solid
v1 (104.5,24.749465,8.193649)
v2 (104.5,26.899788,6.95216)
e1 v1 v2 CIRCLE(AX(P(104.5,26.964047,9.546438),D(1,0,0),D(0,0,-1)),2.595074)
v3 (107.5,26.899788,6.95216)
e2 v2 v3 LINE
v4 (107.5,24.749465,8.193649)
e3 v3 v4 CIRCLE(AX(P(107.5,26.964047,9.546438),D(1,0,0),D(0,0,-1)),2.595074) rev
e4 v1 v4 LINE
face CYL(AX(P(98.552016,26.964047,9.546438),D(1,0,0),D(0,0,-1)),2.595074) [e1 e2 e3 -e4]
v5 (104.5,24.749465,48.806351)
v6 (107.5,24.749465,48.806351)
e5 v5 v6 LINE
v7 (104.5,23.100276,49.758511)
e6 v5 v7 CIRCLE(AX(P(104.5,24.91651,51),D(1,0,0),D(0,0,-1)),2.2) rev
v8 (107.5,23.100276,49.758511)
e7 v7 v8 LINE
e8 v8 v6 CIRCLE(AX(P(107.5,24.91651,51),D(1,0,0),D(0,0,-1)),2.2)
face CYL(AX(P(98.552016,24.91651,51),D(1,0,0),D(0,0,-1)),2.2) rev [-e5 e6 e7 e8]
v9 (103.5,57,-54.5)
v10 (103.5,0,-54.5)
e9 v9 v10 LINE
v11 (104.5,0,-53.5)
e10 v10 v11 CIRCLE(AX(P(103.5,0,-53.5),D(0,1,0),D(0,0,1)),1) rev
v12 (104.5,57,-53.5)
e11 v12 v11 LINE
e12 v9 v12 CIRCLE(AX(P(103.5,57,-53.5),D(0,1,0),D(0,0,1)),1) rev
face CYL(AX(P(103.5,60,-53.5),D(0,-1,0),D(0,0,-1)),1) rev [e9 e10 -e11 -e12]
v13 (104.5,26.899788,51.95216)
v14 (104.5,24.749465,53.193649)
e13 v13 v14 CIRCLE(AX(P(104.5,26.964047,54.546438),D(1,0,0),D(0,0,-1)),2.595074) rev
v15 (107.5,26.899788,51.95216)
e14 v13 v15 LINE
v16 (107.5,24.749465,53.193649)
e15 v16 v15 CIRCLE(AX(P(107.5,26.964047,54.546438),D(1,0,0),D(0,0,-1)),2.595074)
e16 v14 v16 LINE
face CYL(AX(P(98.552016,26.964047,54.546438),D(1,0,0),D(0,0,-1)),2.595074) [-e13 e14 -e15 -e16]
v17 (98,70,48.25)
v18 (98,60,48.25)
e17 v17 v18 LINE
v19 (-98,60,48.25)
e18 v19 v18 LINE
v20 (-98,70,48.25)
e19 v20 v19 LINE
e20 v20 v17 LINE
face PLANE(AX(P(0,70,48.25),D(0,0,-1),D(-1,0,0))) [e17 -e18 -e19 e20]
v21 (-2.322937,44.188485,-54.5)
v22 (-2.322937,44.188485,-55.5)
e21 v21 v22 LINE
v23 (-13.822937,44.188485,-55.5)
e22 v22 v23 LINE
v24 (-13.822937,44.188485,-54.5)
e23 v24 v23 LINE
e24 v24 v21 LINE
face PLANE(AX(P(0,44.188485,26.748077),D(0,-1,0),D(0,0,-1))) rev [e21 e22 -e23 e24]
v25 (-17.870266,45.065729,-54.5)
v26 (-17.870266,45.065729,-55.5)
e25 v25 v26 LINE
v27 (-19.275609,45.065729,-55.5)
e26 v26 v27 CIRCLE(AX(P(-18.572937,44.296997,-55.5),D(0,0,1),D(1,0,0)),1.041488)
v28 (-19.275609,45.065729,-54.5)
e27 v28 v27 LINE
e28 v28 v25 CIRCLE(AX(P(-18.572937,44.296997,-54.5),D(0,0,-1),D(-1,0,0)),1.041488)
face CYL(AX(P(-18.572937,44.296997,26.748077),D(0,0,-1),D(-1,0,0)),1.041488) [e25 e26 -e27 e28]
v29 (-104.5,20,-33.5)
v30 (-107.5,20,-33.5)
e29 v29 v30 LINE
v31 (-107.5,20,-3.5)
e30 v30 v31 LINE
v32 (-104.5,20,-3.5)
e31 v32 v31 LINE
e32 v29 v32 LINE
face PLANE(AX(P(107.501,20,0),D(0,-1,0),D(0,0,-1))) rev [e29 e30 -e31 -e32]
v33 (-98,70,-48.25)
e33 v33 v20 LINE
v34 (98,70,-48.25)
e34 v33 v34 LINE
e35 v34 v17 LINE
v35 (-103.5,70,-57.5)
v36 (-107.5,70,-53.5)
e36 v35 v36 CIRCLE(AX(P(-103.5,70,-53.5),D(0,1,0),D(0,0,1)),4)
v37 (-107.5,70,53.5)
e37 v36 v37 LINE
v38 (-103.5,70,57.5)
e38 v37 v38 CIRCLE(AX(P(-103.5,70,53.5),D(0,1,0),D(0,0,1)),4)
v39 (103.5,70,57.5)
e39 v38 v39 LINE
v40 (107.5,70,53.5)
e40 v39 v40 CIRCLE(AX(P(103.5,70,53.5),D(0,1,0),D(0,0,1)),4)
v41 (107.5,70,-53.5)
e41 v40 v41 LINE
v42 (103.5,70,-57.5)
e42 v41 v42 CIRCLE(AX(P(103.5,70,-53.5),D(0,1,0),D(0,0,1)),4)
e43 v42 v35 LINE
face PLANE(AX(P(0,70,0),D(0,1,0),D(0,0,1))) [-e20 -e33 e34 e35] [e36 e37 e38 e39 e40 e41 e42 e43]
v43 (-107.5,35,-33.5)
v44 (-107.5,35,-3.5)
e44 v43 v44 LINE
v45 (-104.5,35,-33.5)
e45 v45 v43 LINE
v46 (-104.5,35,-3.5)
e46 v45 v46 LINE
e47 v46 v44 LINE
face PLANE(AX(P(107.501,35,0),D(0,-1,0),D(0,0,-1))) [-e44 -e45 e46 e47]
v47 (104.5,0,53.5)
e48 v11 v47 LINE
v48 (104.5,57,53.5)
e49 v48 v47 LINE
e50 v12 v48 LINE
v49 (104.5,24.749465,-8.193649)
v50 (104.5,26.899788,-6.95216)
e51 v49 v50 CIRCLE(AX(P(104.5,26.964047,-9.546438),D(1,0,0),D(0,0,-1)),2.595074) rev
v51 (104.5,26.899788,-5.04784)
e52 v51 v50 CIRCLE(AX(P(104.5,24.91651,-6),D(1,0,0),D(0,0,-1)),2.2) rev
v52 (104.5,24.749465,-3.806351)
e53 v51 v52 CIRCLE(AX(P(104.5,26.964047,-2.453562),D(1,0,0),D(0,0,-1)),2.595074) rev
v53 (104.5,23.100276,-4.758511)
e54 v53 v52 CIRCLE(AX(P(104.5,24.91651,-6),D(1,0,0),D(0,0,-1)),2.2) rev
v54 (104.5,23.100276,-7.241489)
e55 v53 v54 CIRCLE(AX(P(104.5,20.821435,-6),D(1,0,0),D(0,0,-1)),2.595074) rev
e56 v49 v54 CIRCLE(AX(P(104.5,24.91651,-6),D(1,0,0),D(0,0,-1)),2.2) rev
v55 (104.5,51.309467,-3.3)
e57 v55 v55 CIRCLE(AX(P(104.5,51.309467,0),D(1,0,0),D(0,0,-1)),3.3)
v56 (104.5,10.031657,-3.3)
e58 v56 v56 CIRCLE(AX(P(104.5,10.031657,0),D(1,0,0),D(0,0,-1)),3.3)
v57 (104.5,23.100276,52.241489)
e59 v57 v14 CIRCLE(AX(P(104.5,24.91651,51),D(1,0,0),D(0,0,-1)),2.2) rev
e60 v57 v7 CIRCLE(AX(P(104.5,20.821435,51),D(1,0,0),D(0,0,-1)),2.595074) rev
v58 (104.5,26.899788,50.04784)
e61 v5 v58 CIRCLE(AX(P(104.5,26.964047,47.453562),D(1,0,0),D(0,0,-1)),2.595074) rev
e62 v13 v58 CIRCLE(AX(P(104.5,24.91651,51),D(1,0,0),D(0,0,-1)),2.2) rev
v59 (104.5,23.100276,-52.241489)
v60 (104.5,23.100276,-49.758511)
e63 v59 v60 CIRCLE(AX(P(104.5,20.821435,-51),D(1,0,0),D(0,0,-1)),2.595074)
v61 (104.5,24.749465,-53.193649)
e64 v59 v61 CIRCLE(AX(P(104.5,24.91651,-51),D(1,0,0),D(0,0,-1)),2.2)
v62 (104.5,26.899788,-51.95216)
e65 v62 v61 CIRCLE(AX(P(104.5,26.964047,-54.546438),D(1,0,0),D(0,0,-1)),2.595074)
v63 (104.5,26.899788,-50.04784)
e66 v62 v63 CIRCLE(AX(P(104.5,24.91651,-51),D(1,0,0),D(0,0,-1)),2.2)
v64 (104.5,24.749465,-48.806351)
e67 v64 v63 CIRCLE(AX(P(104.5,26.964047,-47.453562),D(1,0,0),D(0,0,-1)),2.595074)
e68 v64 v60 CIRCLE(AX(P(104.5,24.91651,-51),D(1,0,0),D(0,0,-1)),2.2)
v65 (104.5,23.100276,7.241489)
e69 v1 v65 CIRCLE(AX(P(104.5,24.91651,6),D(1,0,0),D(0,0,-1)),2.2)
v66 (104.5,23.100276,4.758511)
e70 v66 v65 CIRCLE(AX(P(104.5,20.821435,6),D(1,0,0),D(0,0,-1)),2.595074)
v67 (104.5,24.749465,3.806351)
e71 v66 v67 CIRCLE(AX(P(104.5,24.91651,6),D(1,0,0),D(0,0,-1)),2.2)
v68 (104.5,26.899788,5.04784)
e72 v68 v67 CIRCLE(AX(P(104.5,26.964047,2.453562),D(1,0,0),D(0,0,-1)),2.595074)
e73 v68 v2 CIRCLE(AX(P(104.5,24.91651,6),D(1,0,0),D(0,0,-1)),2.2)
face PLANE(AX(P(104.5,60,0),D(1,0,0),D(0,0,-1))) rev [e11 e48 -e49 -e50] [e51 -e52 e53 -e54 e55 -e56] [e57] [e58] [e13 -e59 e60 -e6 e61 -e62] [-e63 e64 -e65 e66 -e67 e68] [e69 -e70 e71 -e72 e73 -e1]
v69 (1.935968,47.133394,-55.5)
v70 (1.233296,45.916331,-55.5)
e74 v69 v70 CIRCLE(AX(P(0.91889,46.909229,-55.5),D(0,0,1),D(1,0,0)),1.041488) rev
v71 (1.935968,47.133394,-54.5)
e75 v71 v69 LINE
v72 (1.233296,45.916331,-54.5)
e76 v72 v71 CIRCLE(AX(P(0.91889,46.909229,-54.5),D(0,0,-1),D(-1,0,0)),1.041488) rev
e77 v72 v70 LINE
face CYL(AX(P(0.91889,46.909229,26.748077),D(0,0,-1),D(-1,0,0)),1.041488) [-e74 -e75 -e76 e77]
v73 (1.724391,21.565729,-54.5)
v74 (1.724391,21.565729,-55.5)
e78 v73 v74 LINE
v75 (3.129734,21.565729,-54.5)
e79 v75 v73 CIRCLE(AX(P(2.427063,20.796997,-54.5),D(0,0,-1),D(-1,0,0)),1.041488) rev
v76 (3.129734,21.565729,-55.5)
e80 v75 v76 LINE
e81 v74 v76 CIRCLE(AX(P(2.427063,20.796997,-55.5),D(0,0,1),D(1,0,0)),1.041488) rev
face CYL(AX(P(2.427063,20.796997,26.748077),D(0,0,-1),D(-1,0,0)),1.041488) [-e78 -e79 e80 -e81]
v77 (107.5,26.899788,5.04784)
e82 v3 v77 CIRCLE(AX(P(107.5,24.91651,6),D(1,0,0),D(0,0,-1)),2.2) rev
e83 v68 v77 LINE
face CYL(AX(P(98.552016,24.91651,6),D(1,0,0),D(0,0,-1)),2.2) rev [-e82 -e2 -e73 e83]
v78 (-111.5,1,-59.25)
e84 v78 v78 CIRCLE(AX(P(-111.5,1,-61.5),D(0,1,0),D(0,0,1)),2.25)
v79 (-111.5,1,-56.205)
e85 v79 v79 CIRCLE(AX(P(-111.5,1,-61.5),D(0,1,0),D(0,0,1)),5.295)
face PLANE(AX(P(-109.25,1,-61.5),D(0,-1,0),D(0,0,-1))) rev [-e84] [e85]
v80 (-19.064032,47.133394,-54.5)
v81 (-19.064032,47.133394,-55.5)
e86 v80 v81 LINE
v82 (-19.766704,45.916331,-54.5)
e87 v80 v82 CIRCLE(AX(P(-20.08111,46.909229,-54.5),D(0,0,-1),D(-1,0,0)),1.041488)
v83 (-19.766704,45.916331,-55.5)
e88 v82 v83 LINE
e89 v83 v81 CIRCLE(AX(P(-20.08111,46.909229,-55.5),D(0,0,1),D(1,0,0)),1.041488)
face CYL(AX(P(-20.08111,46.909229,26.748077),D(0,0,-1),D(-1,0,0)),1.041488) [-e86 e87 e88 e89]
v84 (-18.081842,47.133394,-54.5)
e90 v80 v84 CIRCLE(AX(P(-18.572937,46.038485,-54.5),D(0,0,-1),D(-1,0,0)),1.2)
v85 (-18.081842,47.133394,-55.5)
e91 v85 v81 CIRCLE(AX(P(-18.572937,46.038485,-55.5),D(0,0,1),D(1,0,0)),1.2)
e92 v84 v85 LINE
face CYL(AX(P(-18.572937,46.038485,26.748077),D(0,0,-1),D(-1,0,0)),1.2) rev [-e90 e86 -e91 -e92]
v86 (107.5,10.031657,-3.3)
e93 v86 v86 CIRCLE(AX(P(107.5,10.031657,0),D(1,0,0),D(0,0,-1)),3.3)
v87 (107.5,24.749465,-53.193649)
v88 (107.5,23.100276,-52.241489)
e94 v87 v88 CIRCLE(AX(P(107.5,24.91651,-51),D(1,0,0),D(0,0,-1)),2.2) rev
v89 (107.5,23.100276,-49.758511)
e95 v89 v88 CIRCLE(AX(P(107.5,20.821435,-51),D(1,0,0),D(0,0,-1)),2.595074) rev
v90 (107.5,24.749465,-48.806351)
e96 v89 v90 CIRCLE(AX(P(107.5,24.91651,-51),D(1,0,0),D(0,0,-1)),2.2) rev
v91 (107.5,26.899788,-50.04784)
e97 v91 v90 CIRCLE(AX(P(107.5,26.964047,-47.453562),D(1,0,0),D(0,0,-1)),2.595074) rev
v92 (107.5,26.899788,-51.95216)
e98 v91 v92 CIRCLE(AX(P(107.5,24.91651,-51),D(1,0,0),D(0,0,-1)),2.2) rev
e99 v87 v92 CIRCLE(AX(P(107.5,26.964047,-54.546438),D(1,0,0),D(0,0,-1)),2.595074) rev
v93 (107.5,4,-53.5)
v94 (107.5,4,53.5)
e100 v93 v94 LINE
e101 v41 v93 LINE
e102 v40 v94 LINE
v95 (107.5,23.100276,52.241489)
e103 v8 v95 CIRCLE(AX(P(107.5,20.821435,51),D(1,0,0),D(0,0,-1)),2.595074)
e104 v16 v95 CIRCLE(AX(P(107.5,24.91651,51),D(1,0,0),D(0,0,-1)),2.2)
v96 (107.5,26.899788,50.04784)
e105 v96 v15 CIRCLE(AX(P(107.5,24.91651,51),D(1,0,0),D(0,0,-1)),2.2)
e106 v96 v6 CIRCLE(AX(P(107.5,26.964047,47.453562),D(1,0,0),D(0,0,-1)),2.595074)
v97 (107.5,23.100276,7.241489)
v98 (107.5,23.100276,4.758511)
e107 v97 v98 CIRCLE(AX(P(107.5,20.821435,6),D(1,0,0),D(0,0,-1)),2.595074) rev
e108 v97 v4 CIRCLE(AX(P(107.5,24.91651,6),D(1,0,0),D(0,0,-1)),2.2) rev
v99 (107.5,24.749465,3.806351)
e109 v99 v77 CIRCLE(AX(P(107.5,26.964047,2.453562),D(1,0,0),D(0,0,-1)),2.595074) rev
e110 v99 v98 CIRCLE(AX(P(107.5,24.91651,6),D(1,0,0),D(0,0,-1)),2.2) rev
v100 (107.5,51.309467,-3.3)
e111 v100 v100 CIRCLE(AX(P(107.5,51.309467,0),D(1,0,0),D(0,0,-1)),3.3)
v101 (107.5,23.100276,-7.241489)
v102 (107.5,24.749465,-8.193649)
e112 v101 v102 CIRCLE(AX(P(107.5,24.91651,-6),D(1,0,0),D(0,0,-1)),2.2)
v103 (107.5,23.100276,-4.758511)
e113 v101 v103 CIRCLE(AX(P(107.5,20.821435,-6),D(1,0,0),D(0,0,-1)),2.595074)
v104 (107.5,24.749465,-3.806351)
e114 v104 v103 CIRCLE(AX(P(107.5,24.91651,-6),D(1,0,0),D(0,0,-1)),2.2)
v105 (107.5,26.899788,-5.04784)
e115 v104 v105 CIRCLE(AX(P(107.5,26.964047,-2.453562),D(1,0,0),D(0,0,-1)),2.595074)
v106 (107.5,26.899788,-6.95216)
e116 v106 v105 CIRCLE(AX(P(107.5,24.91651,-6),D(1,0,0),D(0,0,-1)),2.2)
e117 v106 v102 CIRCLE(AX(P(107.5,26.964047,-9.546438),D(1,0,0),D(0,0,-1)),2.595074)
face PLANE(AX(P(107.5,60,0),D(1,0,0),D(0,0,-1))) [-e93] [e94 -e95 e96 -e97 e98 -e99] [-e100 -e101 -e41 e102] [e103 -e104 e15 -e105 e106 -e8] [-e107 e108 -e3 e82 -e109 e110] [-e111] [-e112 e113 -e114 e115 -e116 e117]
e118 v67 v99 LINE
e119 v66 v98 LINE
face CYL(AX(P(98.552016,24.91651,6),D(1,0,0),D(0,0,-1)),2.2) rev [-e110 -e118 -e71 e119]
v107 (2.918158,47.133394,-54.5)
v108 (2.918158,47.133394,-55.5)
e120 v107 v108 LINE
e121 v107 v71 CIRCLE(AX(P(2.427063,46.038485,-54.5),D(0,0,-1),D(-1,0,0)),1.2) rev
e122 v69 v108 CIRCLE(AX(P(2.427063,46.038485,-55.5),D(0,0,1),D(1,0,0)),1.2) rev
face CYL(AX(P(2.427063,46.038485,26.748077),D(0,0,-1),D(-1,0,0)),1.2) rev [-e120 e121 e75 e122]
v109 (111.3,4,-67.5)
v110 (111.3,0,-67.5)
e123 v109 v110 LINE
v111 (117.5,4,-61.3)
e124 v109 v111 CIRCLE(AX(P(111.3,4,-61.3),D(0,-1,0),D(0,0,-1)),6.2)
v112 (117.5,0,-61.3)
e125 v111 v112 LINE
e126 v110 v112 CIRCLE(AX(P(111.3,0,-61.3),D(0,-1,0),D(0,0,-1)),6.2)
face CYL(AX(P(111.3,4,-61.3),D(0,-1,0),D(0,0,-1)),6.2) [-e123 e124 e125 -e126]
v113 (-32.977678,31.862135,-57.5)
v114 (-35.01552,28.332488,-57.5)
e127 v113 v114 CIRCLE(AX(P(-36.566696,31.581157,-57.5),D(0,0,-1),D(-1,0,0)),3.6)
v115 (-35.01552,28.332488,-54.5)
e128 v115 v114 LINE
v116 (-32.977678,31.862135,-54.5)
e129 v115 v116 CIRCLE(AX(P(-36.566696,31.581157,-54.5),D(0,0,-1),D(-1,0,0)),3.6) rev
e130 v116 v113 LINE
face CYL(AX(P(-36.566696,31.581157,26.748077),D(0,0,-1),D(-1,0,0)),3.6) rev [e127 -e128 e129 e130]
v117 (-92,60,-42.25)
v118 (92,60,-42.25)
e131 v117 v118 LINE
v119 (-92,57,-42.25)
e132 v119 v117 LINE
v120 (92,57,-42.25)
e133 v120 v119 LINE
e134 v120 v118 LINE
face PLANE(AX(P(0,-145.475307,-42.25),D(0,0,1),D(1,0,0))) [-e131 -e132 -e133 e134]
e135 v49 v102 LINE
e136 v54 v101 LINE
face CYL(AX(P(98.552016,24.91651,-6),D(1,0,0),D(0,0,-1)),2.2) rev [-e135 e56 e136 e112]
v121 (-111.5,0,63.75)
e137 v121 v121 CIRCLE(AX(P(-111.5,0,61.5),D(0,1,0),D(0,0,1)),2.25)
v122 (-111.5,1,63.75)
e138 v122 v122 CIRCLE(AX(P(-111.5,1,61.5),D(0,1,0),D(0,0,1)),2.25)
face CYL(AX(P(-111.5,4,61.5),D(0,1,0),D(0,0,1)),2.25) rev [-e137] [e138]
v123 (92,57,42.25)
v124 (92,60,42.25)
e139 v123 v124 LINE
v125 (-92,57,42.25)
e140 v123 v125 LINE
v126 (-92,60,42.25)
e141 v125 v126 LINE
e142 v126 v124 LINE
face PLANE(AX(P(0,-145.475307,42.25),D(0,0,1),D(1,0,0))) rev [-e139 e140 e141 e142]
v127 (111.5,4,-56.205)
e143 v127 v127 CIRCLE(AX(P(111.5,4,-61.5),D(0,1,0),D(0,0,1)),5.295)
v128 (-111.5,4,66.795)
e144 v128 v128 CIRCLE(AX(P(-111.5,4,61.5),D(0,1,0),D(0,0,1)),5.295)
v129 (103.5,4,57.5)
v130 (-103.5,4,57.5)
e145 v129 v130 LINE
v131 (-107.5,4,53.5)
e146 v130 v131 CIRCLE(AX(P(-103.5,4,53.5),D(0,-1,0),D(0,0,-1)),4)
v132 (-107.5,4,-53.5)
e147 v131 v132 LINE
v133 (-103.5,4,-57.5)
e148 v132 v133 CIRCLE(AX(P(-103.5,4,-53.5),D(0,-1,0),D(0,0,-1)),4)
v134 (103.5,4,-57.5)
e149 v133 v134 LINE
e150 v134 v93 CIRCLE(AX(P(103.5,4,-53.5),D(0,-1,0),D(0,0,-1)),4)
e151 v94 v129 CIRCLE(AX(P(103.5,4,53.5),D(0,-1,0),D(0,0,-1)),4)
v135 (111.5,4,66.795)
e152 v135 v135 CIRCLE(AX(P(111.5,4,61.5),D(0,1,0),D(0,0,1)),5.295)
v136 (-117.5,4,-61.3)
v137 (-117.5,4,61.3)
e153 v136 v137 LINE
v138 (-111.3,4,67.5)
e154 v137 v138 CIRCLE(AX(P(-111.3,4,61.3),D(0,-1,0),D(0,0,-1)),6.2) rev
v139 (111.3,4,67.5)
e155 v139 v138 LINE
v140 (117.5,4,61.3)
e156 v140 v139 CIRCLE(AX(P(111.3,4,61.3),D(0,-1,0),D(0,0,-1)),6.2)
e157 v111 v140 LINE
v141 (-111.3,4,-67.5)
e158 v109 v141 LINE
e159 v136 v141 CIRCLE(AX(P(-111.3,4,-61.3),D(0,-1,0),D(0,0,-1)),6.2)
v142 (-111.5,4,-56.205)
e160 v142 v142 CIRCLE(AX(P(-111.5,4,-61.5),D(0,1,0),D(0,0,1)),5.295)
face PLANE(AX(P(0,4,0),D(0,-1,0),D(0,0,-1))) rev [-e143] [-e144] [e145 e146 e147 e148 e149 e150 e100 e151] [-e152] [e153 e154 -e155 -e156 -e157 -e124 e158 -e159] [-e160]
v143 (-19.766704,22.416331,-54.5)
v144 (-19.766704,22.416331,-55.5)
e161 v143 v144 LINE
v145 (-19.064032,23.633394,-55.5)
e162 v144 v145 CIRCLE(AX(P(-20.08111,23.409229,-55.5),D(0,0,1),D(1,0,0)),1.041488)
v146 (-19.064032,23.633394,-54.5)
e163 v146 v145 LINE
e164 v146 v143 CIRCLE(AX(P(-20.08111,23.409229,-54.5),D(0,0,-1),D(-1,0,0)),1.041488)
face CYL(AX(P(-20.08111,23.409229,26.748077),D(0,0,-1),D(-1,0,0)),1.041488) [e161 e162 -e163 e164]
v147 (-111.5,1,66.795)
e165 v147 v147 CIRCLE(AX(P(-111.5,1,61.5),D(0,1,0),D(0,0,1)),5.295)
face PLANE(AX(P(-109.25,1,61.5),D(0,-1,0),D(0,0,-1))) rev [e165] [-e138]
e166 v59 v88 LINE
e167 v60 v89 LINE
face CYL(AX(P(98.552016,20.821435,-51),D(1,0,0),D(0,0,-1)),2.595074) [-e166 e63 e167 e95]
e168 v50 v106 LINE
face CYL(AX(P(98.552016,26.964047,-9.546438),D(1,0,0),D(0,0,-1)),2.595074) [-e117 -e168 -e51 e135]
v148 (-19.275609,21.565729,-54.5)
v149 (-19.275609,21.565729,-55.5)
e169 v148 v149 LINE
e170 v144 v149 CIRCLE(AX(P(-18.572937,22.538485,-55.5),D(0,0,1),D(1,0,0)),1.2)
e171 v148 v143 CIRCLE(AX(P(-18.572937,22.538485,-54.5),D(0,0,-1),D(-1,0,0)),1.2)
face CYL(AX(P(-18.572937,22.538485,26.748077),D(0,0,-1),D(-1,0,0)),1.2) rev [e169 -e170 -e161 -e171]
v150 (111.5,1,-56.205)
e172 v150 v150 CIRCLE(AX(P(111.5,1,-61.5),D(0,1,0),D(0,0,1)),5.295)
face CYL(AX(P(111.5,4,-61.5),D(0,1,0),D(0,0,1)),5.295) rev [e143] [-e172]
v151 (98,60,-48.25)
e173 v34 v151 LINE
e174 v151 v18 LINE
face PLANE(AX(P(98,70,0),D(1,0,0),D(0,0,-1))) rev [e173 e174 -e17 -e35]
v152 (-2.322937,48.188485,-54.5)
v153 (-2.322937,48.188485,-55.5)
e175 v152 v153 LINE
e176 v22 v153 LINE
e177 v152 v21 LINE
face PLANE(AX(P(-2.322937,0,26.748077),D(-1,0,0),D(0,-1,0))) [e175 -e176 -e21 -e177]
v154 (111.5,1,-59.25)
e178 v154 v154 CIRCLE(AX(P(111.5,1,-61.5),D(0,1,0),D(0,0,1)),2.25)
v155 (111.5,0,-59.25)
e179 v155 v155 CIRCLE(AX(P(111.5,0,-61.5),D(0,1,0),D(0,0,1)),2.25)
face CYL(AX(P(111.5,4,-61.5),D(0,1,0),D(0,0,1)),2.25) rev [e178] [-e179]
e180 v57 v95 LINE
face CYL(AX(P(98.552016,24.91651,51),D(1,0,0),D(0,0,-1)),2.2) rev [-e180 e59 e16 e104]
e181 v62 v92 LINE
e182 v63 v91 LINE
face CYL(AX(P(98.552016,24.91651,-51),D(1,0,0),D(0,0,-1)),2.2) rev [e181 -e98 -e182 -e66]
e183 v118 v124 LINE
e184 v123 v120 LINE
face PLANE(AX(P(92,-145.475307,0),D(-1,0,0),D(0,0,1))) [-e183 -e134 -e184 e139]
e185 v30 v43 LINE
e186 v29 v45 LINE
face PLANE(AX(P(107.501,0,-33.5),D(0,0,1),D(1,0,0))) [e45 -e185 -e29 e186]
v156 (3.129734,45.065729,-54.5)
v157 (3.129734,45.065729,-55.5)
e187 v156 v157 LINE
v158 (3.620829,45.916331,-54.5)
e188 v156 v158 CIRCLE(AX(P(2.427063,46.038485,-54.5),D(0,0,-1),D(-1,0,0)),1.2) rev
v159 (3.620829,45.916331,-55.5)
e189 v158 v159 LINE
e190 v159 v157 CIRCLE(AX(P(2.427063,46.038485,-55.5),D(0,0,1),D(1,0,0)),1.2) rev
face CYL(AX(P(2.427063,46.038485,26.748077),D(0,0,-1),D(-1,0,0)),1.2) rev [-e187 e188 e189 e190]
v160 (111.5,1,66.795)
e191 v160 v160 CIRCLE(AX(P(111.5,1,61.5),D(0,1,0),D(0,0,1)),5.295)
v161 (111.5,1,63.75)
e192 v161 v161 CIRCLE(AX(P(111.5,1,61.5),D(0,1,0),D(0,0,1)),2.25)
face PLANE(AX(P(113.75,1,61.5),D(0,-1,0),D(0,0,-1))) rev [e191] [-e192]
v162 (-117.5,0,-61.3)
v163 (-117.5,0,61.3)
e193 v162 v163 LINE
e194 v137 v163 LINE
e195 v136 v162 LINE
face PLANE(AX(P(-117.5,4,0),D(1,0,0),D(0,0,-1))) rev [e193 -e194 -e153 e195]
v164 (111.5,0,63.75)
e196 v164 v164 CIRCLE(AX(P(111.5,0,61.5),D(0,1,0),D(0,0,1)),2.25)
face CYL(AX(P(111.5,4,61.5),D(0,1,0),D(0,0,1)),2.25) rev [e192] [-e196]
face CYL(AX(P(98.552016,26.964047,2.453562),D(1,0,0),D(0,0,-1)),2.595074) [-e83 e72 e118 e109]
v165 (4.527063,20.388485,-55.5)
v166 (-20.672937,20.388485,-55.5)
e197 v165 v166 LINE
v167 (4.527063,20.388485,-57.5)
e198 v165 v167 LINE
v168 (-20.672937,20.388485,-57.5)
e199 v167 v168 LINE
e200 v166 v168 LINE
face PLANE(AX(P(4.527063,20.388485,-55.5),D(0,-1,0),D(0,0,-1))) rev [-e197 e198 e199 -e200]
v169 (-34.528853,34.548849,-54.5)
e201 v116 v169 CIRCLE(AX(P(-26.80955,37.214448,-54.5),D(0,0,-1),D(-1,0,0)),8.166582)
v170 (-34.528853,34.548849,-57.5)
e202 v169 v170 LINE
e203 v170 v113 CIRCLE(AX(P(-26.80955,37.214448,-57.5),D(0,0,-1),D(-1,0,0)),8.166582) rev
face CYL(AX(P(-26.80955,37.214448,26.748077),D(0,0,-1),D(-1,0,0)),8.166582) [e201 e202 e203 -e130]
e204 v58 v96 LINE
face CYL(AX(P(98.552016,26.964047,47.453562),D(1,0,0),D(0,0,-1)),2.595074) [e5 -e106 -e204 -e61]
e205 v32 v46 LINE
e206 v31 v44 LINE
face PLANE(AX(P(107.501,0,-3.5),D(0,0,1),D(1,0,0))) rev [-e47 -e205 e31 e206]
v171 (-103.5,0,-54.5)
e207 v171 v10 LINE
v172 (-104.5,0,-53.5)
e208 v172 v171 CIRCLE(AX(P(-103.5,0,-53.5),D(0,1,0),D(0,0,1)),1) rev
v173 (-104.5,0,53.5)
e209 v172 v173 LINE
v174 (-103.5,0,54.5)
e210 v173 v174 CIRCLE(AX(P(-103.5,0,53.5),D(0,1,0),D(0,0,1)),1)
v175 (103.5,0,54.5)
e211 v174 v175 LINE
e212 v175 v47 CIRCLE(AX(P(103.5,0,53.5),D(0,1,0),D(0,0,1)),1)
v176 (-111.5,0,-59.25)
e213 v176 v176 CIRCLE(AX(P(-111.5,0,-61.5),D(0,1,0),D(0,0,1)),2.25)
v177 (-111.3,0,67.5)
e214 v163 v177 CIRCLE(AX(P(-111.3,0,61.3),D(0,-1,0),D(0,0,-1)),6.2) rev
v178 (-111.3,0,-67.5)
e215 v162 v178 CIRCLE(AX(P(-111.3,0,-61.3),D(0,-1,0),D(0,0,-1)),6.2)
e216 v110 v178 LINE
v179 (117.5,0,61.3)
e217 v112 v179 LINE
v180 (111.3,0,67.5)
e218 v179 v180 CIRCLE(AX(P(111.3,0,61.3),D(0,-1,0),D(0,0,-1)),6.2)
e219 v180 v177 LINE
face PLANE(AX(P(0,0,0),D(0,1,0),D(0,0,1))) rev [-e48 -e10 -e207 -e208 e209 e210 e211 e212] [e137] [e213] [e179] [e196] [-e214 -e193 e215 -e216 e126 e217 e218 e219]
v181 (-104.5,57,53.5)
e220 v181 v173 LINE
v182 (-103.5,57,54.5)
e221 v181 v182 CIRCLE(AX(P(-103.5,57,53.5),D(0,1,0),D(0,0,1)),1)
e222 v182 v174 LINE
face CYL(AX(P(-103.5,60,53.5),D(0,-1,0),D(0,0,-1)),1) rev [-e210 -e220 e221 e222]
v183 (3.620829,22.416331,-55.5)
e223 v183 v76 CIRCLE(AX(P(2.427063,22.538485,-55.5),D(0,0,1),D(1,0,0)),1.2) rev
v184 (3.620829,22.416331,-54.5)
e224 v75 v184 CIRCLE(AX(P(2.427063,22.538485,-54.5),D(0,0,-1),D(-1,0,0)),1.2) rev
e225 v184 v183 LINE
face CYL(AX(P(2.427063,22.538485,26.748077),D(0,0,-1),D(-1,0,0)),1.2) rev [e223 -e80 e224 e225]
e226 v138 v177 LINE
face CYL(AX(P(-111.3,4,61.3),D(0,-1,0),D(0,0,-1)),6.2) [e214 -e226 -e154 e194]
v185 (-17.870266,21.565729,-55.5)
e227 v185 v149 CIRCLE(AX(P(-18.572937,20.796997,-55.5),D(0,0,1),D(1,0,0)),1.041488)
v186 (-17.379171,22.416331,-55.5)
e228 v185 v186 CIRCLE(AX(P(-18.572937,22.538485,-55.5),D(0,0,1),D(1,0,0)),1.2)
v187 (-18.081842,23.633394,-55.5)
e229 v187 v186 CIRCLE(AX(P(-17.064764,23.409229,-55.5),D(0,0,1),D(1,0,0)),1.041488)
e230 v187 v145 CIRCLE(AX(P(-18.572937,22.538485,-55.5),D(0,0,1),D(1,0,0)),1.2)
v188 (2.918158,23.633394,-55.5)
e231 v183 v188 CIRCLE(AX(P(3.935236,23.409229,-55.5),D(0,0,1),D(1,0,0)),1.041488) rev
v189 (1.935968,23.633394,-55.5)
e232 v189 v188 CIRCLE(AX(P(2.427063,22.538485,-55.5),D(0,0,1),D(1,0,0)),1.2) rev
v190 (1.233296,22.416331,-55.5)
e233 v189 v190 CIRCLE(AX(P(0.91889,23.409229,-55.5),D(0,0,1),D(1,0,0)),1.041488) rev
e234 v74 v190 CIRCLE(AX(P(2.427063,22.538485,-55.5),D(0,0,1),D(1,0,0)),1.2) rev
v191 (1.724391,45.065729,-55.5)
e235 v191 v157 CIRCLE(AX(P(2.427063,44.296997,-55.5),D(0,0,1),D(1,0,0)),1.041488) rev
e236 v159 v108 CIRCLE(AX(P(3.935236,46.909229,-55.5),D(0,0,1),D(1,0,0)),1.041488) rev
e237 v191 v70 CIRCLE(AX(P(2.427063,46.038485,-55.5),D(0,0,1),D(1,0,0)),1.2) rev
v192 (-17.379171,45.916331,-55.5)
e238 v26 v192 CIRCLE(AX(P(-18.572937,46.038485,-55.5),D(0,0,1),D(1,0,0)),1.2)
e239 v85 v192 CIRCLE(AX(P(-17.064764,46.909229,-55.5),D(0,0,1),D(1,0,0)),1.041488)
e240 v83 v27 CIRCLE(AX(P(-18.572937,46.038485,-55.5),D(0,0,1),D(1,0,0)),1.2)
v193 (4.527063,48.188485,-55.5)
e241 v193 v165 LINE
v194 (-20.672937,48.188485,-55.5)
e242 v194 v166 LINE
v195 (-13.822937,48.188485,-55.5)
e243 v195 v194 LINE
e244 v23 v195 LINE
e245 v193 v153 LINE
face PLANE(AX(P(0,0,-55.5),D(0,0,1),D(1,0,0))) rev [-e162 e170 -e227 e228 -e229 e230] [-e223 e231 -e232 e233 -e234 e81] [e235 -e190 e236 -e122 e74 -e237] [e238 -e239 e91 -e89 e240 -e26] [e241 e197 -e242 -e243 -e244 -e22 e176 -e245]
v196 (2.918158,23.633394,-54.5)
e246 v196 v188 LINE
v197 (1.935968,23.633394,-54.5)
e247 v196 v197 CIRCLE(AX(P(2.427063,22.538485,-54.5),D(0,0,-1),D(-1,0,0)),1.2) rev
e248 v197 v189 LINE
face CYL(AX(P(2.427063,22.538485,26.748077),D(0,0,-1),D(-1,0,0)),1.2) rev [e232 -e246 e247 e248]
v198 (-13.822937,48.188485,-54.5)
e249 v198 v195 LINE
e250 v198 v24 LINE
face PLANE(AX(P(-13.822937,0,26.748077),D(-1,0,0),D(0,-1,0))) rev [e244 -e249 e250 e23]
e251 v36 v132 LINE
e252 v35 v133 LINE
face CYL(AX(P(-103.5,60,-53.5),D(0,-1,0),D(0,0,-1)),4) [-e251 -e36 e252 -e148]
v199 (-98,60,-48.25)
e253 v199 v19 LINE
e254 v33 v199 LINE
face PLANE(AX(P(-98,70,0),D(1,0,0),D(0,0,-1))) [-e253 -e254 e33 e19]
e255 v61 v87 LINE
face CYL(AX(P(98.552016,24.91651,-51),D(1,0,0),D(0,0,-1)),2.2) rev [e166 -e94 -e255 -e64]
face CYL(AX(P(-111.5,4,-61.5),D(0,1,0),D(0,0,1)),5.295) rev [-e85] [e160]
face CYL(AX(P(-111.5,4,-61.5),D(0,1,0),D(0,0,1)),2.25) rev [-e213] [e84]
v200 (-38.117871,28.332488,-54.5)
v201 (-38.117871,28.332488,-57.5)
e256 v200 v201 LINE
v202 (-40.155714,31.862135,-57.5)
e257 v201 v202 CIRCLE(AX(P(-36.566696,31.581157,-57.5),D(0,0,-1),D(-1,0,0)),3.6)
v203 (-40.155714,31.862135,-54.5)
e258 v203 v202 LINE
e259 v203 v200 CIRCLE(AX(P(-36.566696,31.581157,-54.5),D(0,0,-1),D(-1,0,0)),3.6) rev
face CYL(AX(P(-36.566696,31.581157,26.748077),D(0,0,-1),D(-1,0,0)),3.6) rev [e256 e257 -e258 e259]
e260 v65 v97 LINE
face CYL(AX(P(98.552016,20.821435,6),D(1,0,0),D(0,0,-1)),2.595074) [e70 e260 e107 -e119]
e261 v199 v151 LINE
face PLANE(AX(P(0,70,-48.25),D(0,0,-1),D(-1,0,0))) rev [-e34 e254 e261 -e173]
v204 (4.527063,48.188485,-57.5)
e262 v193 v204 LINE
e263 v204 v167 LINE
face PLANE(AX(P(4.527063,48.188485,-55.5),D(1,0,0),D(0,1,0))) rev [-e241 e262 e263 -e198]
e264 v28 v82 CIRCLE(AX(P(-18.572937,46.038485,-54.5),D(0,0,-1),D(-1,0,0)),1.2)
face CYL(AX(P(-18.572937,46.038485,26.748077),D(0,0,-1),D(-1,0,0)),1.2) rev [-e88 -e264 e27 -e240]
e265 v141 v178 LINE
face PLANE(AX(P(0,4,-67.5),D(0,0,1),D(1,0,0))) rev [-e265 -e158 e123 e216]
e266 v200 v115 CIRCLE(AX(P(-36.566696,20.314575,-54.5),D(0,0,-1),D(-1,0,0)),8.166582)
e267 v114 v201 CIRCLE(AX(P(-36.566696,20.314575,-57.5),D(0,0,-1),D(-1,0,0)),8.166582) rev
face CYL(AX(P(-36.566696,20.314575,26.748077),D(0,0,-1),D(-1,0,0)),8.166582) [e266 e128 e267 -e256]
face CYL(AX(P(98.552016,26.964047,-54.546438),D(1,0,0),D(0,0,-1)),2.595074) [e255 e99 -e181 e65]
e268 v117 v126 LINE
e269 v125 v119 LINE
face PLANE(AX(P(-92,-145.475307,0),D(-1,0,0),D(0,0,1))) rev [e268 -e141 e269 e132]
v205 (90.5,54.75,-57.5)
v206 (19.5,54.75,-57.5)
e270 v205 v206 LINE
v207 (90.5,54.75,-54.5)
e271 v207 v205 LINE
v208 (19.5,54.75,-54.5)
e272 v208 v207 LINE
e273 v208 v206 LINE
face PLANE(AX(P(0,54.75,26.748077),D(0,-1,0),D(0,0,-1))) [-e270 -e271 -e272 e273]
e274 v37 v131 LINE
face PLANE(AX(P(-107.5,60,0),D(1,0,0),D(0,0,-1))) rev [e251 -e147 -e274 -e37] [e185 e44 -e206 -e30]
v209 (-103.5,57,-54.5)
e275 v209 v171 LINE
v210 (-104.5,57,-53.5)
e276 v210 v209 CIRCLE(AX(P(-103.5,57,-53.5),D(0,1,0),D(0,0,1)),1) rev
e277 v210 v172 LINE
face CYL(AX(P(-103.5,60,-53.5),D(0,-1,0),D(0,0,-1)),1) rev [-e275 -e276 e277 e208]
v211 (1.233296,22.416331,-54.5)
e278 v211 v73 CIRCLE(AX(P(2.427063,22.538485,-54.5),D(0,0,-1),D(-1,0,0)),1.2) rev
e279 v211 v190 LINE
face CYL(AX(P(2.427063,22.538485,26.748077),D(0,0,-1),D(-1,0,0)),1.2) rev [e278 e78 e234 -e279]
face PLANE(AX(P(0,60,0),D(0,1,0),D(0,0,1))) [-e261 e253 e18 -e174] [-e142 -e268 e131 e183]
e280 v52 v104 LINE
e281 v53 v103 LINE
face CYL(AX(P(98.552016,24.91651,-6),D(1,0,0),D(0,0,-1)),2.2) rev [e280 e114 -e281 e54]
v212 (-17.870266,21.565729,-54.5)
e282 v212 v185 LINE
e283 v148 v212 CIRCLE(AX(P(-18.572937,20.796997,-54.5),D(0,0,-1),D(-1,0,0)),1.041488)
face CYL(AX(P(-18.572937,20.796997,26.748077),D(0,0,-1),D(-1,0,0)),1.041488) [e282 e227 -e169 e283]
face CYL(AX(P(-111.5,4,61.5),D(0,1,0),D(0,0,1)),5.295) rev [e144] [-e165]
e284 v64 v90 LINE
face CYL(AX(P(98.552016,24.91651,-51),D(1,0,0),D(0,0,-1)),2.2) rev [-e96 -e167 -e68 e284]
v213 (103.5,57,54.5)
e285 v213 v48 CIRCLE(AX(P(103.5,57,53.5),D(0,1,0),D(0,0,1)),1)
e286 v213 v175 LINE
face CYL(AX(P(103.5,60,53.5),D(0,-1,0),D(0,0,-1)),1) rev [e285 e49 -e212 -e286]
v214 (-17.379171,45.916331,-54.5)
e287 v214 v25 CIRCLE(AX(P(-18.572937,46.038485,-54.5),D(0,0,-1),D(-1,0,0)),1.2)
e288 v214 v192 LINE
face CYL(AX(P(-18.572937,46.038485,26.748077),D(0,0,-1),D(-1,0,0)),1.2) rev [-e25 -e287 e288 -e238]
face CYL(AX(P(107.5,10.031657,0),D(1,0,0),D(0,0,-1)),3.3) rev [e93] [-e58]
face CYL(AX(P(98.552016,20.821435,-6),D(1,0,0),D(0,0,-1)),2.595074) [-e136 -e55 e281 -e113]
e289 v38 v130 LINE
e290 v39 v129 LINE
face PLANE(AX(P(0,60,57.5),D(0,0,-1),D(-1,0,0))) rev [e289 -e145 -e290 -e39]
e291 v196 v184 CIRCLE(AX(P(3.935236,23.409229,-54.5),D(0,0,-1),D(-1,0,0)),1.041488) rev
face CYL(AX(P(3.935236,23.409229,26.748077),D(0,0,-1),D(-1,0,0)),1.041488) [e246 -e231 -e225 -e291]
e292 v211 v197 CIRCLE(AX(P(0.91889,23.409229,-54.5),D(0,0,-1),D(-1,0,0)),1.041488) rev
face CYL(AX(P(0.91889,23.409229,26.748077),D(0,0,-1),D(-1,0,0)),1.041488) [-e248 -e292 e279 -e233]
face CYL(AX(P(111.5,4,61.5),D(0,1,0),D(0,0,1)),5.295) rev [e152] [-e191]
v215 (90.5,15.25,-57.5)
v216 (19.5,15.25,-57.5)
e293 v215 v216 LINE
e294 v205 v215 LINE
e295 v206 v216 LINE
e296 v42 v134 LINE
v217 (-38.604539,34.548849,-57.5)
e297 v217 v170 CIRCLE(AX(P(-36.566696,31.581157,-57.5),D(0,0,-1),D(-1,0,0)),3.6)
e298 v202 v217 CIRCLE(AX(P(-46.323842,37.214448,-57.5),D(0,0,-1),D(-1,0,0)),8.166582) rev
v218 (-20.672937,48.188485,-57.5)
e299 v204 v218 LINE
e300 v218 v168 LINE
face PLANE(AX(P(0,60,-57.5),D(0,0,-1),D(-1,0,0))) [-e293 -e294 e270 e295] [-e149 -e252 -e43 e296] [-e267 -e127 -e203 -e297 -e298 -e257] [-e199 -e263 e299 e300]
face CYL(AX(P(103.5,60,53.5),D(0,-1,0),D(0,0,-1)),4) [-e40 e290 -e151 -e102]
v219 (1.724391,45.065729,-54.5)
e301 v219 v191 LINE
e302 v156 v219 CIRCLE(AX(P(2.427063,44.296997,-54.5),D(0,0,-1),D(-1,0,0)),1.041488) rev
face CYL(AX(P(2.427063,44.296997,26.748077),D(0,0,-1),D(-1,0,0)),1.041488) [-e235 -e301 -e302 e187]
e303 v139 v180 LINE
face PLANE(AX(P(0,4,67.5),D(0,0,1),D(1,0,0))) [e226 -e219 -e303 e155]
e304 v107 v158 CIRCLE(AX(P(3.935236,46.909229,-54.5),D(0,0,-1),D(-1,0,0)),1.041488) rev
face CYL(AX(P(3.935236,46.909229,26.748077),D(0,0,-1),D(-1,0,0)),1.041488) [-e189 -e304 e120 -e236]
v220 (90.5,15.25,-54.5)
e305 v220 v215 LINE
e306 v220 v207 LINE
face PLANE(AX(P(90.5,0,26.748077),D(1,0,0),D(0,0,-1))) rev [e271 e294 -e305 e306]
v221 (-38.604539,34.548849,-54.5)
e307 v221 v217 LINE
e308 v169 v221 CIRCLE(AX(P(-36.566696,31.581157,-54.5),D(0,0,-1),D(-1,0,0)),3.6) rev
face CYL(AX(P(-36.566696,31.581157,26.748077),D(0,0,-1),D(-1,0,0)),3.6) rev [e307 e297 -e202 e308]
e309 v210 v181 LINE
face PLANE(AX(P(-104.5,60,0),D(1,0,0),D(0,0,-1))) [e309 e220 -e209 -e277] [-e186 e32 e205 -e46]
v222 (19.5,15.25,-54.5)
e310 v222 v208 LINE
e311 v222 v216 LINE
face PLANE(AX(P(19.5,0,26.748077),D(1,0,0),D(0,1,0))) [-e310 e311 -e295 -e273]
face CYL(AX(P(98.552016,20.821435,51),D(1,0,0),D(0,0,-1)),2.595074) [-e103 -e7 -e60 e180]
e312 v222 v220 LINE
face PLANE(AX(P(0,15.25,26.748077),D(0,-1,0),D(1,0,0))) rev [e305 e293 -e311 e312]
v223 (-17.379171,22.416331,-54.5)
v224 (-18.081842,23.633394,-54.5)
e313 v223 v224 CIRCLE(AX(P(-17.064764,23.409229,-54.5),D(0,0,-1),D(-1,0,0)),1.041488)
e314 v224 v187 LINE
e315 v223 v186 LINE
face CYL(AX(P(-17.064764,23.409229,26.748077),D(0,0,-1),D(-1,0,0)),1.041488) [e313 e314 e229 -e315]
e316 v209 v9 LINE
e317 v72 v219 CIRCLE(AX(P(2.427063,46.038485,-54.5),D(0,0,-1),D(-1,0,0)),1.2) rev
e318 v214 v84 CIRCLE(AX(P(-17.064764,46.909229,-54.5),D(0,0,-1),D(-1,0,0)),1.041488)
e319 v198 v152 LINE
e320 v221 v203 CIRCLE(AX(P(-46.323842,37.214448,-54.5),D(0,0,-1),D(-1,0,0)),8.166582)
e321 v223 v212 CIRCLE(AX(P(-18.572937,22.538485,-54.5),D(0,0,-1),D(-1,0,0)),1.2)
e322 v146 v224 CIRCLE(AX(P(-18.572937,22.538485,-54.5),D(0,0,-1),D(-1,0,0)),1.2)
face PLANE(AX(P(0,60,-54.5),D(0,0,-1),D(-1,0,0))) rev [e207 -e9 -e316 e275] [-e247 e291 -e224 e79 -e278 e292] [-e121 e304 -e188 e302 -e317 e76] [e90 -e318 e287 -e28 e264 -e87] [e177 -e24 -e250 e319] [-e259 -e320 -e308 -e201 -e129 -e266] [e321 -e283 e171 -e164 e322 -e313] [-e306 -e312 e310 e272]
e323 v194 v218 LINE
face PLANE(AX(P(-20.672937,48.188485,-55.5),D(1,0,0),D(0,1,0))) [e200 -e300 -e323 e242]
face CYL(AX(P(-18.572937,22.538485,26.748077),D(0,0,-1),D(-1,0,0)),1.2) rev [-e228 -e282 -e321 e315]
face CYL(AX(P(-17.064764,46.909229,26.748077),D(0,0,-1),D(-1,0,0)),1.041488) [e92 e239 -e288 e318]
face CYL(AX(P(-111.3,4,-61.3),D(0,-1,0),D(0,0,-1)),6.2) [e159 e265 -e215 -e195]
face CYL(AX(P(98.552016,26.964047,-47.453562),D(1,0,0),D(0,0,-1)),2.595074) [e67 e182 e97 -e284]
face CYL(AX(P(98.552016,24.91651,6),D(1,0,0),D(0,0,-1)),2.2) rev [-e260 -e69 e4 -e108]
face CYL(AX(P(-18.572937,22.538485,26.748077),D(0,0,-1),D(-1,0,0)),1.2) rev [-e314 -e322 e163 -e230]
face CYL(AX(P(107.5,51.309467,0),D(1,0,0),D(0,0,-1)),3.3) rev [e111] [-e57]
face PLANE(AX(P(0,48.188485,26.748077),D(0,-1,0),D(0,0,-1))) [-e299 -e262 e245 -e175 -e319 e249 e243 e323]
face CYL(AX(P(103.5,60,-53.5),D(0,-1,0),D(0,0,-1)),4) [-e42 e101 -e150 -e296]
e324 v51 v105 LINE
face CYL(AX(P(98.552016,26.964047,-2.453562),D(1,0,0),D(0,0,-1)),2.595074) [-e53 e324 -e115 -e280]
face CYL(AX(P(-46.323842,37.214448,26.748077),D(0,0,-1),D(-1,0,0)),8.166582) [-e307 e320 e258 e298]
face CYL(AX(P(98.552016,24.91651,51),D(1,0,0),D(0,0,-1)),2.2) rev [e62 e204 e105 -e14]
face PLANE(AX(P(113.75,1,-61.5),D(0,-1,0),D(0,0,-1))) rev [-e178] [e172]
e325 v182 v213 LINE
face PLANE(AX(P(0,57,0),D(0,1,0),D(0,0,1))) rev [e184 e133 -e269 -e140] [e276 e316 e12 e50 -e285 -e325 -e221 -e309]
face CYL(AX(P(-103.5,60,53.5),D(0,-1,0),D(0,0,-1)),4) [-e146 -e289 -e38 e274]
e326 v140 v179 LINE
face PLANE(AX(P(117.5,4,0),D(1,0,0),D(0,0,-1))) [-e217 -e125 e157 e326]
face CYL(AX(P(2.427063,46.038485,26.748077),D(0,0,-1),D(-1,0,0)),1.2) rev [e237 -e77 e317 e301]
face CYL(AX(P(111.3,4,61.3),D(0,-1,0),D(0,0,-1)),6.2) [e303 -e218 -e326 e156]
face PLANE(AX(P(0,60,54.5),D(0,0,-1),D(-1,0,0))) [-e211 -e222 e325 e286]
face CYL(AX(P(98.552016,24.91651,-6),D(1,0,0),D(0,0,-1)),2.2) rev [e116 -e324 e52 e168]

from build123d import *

# Parameters (mm, degrees)
BOSS_EXTRU_1_DEPTH                                 = 60
COQUE1_T                                           = -3
BOSS_EXTRU_2_OUTLINE_W                             = 196
BOSS_EXTRU_2_OUTLINE_H                             = 96.5
BOSS_EXTRU_2_DEPTH                                 = 10
ESQUISSE3_W                                        = 71
ESQUISSE3_H                                        = 39.5
ESQUISSE3_W_2                                      = 11.5
ESQUISSE3_H_2                                      = 4
ENL_V_MAT_EXTRU_1_DEPTH                            = 3
ESQUISSE3_4_W                                      = 25.2
ESQUISSE3_4_H                                      = 27.8
ENL_V_MAT_EXTRU_2_DEPTH                            = 2
ESQUISSE5_W                                        = 184
ESQUISSE5_H                                        = 84.5
ENL_V_MAT_EXTRU_3_DEPTH                            = 3
ENL_V_MAT_EXTRU_4_REACH                            = 235.305
ESQUISSE8_W                                        = 30
ESQUISSE8_H                                        = 15
ESQUISSE9_W                                        = 209
ESQUISSE9_H                                        = 109
BOSS_EXTRU_4_DEPTH                                 = 4
CHAMBRAGE_POUR_VIS_T_TE_HEXAGONALE_M41_D           = 4.5
CHAMBRAGE_POUR_VIS_T_TE_HEXAGONALE_M41_CBORE_D     = 10.59
CHAMBRAGE_POUR_VIS_T_TE_HEXAGONALE_M41_CBORE_DEPTH = 3
ENL_V_MAT_EXTRU_5_DEPTH                            = 3
D_GAGEMENT_M61_D                                   = 6.6
D_GAGEMENT_M61_DEPTH                               = 3


# Read off the part's stored shape, not the designer's step: Boss.-Extru.2
with BuildPart() as part:
    # Esquisse1 → Boss.-Extru.1 (new body)
    with BuildSketch(Plane(origin=(0, 0, 0), x_dir=(1, 0, 0), z_dir=(0, 1, 0))):
        with BuildLine():
            Line((-103.5, 57.5), (103.5, 57.5))
            ThreePointArc((103.5, 57.5), (106.328427125, 56.328427125), (107.5, 53.5))
            Line((107.5, 53.5), (107.5, -53.5))
            ThreePointArc((107.5, -53.5), (106.328427125, -56.328427125), (103.5, -57.5))
            Line((103.5, -57.5), (-103.5, -57.5))
            ThreePointArc((-103.5, -57.5), (-106.328427125, -56.328427125), (-107.5, -53.5))
            Line((-107.5, -53.5), (-107.5, 53.5))
            ThreePointArc((-107.5, 53.5), (-106.328427125, 56.328427125), (-103.5, 57.5))
        make_face()
    extrude(amount=BOSS_EXTRU_1_DEPTH)

    # Coque1
    coque1_openings = [part.faces().sort_by_distance(p)[0] for p in [
        (0, 0, 0),
    ]]
    offset(amount=COQUE1_T, openings=coque1_openings, kind=Kind.INTERSECTION)

    # Boss.-Extru.2 outline → Boss.-Extru.2 (add)
    with BuildSketch(Plane(origin=(0, 60, 0), x_dir=(1, 0, 0), z_dir=(0, 1, 0))):
        with BuildLine():
            ThreePointArc((-103.5, 57.5), (-106.328427125, 56.328427125), (-107.5, 53.5))
            Line((-107.5, 53.5), (-107.5, -53.5))
            ThreePointArc((-107.5, -53.5), (-106.328427125, -56.328427125), (-103.5, -57.5))
            Line((-103.5, -57.5), (103.5, -57.5))
            ThreePointArc((103.5, -57.5), (106.328427125, -56.328427125), (107.5, -53.5))
            Line((107.5, -53.5), (107.5, 53.5))
            ThreePointArc((107.5, 53.5), (106.328427125, 56.328427125), (103.5, 57.5))
            Line((103.5, 57.5), (-103.5, 57.5))
        make_face()
        Rectangle(BOSS_EXTRU_2_OUTLINE_W, BOSS_EXTRU_2_OUTLINE_H, mode=Mode.SUBTRACT)
    extrude(amount=BOSS_EXTRU_2_DEPTH)

    # Esquisse3 → Enlèv. mat.-Extru.1 (cut)
    with BuildSketch(Plane(origin=(0, 0, -57.5), x_dir=(-1, 0, 0), z_dir=(0, 0, -1))):
        with Locations((-55, 35)):
            Rectangle(ESQUISSE3_W, ESQUISSE3_H)
        with Locations((8.072937115, 46.188484734)):
            Rectangle(ESQUISSE3_W_2, ESQUISSE3_H_2)
        with BuildLine():
            ThreePointArc((38.117871013, 28.332487519), (39.61171058, 29.660770737), (40.166695713, 31.581157276))
            ThreePointArc((40.166695713, 31.581157276), (40.163949212, 31.721753371), (40.155713901, 31.862134939))
            ThreePointArc((40.155713901, 31.862134939), (39.251374465, 33.131157276), (38.604538601, 34.54884937))
            ThreePointArc((38.604538601, 34.54884937), (36.566695713, 35.181157276), (34.528852825, 34.54884937))
            ThreePointArc((34.528852825, 34.54884937), (33.882016961, 33.131157276), (32.977677525, 31.862134939))
            ThreePointArc((32.977677525, 31.862134939), (33.449004259, 29.781157276), (35.015520413, 28.332487519))
            ThreePointArc((35.015520413, 28.332487519), (36.566695713, 28.481157276), (38.117871013, 28.332487519))
        make_face()
        with BuildLine():
            ThreePointArc((-1.233296382, 45.916330985), (-1.820845102, 46.388484734), (-1.935967883, 47.133393726))
            ThreePointArc((-1.935967883, 47.133393726), (-2.427062885, 47.238484734), (-2.918157886, 47.133393726))
            ThreePointArc((-2.918157886, 47.133393726), (-3.033280667, 46.388484734), (-3.620829387, 45.916330985))
            ThreePointArc((-3.620829387, 45.916330985), (-3.466293369, 45.438484734), (-3.129734385, 45.065729492))
            ThreePointArc((-3.129734385, 45.065729492), (-2.427062885, 45.338484734), (-1.724391384, 45.065729492))
            ThreePointArc((-1.724391384, 45.065729492), (-1.3878324, 45.438484734), (-1.233296382, 45.916330985))
        make_face()
        with BuildLine():
            ThreePointArc((17.379170613, 45.916330985), (17.533706631, 45.438484734), (17.870265615, 45.065729492))
            ThreePointArc((17.870265615, 45.065729492), (18.572937115, 45.338484734), (19.275608616, 45.065729492))
            ThreePointArc((19.275608616, 45.065729492), (19.6121676, 45.438484734), (19.766703618, 45.916330985))
            ThreePointArc((19.766703618, 45.916330985), (19.179154898, 46.388484734), (19.064032117, 47.133393726))
            ThreePointArc((19.064032117, 47.133393726), (18.572937115, 47.238484734), (18.081842114, 47.133393726))
            ThreePointArc((18.081842114, 47.133393726), (17.966719333, 46.388484734), (17.379170613, 45.916330985))
        make_face()
        with BuildLine():
            ThreePointArc((-1.233296382, 22.416330985), (-1.820845102, 22.888484734), (-1.935967883, 23.633393726))
            ThreePointArc((-1.935967883, 23.633393726), (-2.427062885, 23.738484734), (-2.918157886, 23.633393726))
            ThreePointArc((-2.918157886, 23.633393726), (-3.033280667, 22.888484734), (-3.620829387, 22.416330985))
            ThreePointArc((-3.620829387, 22.416330985), (-3.466293369, 21.938484734), (-3.129734385, 21.565729492))
            ThreePointArc((-3.129734385, 21.565729492), (-2.427062885, 21.838484734), (-1.724391384, 21.565729492))
            ThreePointArc((-1.724391384, 21.565729492), (-1.3878324, 21.938484734), (-1.233296382, 22.416330985))
        make_face()
        with BuildLine():
            ThreePointArc((19.766703618, 22.416330985), (19.179154898, 22.888484734), (19.064032117, 23.633393726))
            ThreePointArc((19.064032117, 23.633393726), (18.572937115, 23.738484734), (18.081842114, 23.633393726))
            ThreePointArc((18.081842114, 23.633393726), (17.966719333, 22.888484734), (17.379170613, 22.416330985))
            ThreePointArc((17.379170613, 22.416330985), (17.533706631, 21.938484734), (17.870265615, 21.565729492))
            ThreePointArc((17.870265615, 21.565729492), (18.572937115, 21.838484734), (19.275608616, 21.565729492))
            ThreePointArc((19.275608616, 21.565729492), (19.6121676, 21.938484734), (19.766703618, 22.416330985))
        make_face()
    extrude(amount=-ENL_V_MAT_EXTRU_1_DEPTH, mode=Mode.SUBTRACT)

    # Esquisse3<4> → Enlèv. mat.-Extru.2 (cut)
    with BuildSketch(Plane(origin=(0, 0, -57.5), x_dir=(-1, 0, 0), z_dir=(0, 0, -1))):
        with Locations((8.072937115, 34.288484734)):
            Rectangle(ESQUISSE3_4_W, ESQUISSE3_4_H)
    extrude(amount=-ENL_V_MAT_EXTRU_2_DEPTH, mode=Mode.SUBTRACT)

    # Esquisse5 → Enlèv. mat.-Extru.3 (cut)
    with BuildSketch(Plane(origin=(0, 60, 0), x_dir=(1, 0, 0), z_dir=(0, 1, 0))):
        Rectangle(ESQUISSE5_W, ESQUISSE5_H)
    extrude(amount=-ENL_V_MAT_EXTRU_3_DEPTH, mode=Mode.SUBTRACT)

    # Esquisse8 → Enlèv. mat.-Extru.4 (cut, up to next)
    with BuildSketch(Plane.ZY.offset(107.5), mode=Mode.PRIVATE) as enl_v_mat_extru_4_sk1:
        with Locations((-18.5, 27.5)):
            Rectangle(ESQUISSE8_W, ESQUISSE8_H)
    enl_v_mat_extru_4_tool1 = extrude(enl_v_mat_extru_4_sk1.sketch, amount=-ENL_V_MAT_EXTRU_4_REACH, mode=Mode.PRIVATE) & part.part
    add(enl_v_mat_extru_4_tool1.solids().sort_by_distance((-107.5, 27.5, -18.5))[0], mode=Mode.SUBTRACT)

    # Esquisse9 → Boss.-Extru.4 (add)
    with BuildSketch(Plane.XZ):
        with BuildLine():
            Line((111.3, -67.5), (-111.3, -67.5))
            ThreePointArc((-111.3, -67.5), (-115.684062043, -65.684062043), (-117.5, -61.3))
            Line((-117.5, -61.3), (-117.5, 61.3))
            ThreePointArc((-117.5, 61.3), (-115.684062043, 65.684062043), (-111.3, 67.5))
            Line((-111.3, 67.5), (111.3, 67.5))
            ThreePointArc((111.3, 67.5), (115.684062043, 65.684062043), (117.5, 61.3))
            Line((117.5, 61.3), (117.5, -61.3))
            ThreePointArc((117.5, -61.3), (115.684062043, -65.684062043), (111.3, -67.5))
        make_face()
        Rectangle(ESQUISSE9_W, ESQUISSE9_H, mode=Mode.SUBTRACT)
    extrude(amount=-BOSS_EXTRU_4_DEPTH)

    # Chambrage pour vis à tête hexagonale M41 (through all)
    with Locations(Plane(origin=(0, 4, 0), x_dir=(1, 0, 0), z_dir=(0, 1, 0))):
        with Locations((-111.5, 61.5), (111.5, 61.5), (111.5, -61.5), (-111.5, -61.5)):
            CounterBoreHole(CHAMBRAGE_POUR_VIS_T_TE_HEXAGONALE_M41_D / 2, CHAMBRAGE_POUR_VIS_T_TE_HEXAGONALE_M41_CBORE_D / 2, CHAMBRAGE_POUR_VIS_T_TE_HEXAGONALE_M41_CBORE_DEPTH)

    # Esquisse13 → Enlèv. mat.-Extru.5 (cut)
    with BuildSketch(Plane(origin=(107.5, 0, 0), x_dir=(0, 0, -1), z_dir=(1, 0, 0))):
        with BuildLine():
            ThreePointArc((8.193649051, 24.74946516), (7.299038106, 25.666509594), (6.952159802, 26.899787616))
            ThreePointArc((6.952159802, 26.899787616), (6, 27.116509594), (5.047840198, 26.899787616))
            ThreePointArc((5.047840198, 26.899787616), (4.700961894, 25.666509594), (3.806350949, 24.74946516))
            ThreePointArc((3.806350949, 24.74946516), (4.094744112, 23.816509594), (4.758510751, 23.100276006))
            ThreePointArc((4.758510751, 23.100276006), (6, 23.416509594), (7.241489249, 23.100276006))
            ThreePointArc((7.241489249, 23.100276006), (7.905255888, 23.816509594), (8.193649051, 24.74946516))
        make_face()
        with BuildLine():
            ThreePointArc((51.952159802, 26.899787616), (51, 27.116509594), (50.047840198, 26.899787616))
            ThreePointArc((50.047840198, 26.899787616), (49.700961894, 25.666509594), (48.806350949, 24.74946516))
            ThreePointArc((48.806350949, 24.74946516), (49.094744112, 23.816509594), (49.758510751, 23.100276006))
            ThreePointArc((49.758510751, 23.100276006), (51, 23.416509594), (52.241489249, 23.100276006))
            ThreePointArc((52.241489249, 23.100276006), (52.905255888, 23.816509594), (53.193649051, 24.74946516))
            ThreePointArc((53.193649051, 24.74946516), (52.299038106, 25.666509594), (51.952159802, 26.899787616))
        make_face()
        with BuildLine():
            ThreePointArc((-48.806350949, 24.74946516), (-49.700961894, 25.666509594), (-50.047840198, 26.899787616))
            ThreePointArc((-50.047840198, 26.899787616), (-51, 27.116509594), (-51.952159802, 26.899787616))
            ThreePointArc((-51.952159802, 26.899787616), (-52.299038106, 25.666509594), (-53.193649051, 24.74946516))
            ThreePointArc((-53.193649051, 24.74946516), (-52.905255888, 23.816509594), (-52.241489249, 23.100276006))
            ThreePointArc((-52.241489249, 23.100276006), (-51, 23.416509594), (-49.758510751, 23.100276006))
            ThreePointArc((-49.758510751, 23.100276006), (-49.094744112, 23.816509594), (-48.806350949, 24.74946516))
        make_face()
        with BuildLine():
            ThreePointArc((-5.047840198, 26.899787616), (-6, 27.116509594), (-6.952159802, 26.899787616))
            ThreePointArc((-6.952159802, 26.899787616), (-7.299038106, 25.666509594), (-8.193649051, 24.74946516))
            ThreePointArc((-8.193649051, 24.74946516), (-7.905255888, 23.816509594), (-7.241489249, 23.100276006))
            ThreePointArc((-7.241489249, 23.100276006), (-6, 23.416509594), (-4.758510751, 23.100276006))
            ThreePointArc((-4.758510751, 23.100276006), (-4.094744112, 23.816509594), (-3.806350949, 24.74946516))
            ThreePointArc((-3.806350949, 24.74946516), (-4.700961894, 25.666509594), (-5.047840198, 26.899787616))
        make_face()
    extrude(amount=-ENL_V_MAT_EXTRU_5_DEPTH, mode=Mode.SUBTRACT)

    # Dégagement M61
    with Locations(Plane(origin=(107.5, 0, 0), x_dir=(0, 0, -1), z_dir=(1, 0, 0))):
        with Locations((0, 51.309466908), (0, 10.031656552)):
            Hole(D_GAGEMENT_M61_D / 2, depth=D_GAGEMENT_M61_DEPTH)


solid = part.part
